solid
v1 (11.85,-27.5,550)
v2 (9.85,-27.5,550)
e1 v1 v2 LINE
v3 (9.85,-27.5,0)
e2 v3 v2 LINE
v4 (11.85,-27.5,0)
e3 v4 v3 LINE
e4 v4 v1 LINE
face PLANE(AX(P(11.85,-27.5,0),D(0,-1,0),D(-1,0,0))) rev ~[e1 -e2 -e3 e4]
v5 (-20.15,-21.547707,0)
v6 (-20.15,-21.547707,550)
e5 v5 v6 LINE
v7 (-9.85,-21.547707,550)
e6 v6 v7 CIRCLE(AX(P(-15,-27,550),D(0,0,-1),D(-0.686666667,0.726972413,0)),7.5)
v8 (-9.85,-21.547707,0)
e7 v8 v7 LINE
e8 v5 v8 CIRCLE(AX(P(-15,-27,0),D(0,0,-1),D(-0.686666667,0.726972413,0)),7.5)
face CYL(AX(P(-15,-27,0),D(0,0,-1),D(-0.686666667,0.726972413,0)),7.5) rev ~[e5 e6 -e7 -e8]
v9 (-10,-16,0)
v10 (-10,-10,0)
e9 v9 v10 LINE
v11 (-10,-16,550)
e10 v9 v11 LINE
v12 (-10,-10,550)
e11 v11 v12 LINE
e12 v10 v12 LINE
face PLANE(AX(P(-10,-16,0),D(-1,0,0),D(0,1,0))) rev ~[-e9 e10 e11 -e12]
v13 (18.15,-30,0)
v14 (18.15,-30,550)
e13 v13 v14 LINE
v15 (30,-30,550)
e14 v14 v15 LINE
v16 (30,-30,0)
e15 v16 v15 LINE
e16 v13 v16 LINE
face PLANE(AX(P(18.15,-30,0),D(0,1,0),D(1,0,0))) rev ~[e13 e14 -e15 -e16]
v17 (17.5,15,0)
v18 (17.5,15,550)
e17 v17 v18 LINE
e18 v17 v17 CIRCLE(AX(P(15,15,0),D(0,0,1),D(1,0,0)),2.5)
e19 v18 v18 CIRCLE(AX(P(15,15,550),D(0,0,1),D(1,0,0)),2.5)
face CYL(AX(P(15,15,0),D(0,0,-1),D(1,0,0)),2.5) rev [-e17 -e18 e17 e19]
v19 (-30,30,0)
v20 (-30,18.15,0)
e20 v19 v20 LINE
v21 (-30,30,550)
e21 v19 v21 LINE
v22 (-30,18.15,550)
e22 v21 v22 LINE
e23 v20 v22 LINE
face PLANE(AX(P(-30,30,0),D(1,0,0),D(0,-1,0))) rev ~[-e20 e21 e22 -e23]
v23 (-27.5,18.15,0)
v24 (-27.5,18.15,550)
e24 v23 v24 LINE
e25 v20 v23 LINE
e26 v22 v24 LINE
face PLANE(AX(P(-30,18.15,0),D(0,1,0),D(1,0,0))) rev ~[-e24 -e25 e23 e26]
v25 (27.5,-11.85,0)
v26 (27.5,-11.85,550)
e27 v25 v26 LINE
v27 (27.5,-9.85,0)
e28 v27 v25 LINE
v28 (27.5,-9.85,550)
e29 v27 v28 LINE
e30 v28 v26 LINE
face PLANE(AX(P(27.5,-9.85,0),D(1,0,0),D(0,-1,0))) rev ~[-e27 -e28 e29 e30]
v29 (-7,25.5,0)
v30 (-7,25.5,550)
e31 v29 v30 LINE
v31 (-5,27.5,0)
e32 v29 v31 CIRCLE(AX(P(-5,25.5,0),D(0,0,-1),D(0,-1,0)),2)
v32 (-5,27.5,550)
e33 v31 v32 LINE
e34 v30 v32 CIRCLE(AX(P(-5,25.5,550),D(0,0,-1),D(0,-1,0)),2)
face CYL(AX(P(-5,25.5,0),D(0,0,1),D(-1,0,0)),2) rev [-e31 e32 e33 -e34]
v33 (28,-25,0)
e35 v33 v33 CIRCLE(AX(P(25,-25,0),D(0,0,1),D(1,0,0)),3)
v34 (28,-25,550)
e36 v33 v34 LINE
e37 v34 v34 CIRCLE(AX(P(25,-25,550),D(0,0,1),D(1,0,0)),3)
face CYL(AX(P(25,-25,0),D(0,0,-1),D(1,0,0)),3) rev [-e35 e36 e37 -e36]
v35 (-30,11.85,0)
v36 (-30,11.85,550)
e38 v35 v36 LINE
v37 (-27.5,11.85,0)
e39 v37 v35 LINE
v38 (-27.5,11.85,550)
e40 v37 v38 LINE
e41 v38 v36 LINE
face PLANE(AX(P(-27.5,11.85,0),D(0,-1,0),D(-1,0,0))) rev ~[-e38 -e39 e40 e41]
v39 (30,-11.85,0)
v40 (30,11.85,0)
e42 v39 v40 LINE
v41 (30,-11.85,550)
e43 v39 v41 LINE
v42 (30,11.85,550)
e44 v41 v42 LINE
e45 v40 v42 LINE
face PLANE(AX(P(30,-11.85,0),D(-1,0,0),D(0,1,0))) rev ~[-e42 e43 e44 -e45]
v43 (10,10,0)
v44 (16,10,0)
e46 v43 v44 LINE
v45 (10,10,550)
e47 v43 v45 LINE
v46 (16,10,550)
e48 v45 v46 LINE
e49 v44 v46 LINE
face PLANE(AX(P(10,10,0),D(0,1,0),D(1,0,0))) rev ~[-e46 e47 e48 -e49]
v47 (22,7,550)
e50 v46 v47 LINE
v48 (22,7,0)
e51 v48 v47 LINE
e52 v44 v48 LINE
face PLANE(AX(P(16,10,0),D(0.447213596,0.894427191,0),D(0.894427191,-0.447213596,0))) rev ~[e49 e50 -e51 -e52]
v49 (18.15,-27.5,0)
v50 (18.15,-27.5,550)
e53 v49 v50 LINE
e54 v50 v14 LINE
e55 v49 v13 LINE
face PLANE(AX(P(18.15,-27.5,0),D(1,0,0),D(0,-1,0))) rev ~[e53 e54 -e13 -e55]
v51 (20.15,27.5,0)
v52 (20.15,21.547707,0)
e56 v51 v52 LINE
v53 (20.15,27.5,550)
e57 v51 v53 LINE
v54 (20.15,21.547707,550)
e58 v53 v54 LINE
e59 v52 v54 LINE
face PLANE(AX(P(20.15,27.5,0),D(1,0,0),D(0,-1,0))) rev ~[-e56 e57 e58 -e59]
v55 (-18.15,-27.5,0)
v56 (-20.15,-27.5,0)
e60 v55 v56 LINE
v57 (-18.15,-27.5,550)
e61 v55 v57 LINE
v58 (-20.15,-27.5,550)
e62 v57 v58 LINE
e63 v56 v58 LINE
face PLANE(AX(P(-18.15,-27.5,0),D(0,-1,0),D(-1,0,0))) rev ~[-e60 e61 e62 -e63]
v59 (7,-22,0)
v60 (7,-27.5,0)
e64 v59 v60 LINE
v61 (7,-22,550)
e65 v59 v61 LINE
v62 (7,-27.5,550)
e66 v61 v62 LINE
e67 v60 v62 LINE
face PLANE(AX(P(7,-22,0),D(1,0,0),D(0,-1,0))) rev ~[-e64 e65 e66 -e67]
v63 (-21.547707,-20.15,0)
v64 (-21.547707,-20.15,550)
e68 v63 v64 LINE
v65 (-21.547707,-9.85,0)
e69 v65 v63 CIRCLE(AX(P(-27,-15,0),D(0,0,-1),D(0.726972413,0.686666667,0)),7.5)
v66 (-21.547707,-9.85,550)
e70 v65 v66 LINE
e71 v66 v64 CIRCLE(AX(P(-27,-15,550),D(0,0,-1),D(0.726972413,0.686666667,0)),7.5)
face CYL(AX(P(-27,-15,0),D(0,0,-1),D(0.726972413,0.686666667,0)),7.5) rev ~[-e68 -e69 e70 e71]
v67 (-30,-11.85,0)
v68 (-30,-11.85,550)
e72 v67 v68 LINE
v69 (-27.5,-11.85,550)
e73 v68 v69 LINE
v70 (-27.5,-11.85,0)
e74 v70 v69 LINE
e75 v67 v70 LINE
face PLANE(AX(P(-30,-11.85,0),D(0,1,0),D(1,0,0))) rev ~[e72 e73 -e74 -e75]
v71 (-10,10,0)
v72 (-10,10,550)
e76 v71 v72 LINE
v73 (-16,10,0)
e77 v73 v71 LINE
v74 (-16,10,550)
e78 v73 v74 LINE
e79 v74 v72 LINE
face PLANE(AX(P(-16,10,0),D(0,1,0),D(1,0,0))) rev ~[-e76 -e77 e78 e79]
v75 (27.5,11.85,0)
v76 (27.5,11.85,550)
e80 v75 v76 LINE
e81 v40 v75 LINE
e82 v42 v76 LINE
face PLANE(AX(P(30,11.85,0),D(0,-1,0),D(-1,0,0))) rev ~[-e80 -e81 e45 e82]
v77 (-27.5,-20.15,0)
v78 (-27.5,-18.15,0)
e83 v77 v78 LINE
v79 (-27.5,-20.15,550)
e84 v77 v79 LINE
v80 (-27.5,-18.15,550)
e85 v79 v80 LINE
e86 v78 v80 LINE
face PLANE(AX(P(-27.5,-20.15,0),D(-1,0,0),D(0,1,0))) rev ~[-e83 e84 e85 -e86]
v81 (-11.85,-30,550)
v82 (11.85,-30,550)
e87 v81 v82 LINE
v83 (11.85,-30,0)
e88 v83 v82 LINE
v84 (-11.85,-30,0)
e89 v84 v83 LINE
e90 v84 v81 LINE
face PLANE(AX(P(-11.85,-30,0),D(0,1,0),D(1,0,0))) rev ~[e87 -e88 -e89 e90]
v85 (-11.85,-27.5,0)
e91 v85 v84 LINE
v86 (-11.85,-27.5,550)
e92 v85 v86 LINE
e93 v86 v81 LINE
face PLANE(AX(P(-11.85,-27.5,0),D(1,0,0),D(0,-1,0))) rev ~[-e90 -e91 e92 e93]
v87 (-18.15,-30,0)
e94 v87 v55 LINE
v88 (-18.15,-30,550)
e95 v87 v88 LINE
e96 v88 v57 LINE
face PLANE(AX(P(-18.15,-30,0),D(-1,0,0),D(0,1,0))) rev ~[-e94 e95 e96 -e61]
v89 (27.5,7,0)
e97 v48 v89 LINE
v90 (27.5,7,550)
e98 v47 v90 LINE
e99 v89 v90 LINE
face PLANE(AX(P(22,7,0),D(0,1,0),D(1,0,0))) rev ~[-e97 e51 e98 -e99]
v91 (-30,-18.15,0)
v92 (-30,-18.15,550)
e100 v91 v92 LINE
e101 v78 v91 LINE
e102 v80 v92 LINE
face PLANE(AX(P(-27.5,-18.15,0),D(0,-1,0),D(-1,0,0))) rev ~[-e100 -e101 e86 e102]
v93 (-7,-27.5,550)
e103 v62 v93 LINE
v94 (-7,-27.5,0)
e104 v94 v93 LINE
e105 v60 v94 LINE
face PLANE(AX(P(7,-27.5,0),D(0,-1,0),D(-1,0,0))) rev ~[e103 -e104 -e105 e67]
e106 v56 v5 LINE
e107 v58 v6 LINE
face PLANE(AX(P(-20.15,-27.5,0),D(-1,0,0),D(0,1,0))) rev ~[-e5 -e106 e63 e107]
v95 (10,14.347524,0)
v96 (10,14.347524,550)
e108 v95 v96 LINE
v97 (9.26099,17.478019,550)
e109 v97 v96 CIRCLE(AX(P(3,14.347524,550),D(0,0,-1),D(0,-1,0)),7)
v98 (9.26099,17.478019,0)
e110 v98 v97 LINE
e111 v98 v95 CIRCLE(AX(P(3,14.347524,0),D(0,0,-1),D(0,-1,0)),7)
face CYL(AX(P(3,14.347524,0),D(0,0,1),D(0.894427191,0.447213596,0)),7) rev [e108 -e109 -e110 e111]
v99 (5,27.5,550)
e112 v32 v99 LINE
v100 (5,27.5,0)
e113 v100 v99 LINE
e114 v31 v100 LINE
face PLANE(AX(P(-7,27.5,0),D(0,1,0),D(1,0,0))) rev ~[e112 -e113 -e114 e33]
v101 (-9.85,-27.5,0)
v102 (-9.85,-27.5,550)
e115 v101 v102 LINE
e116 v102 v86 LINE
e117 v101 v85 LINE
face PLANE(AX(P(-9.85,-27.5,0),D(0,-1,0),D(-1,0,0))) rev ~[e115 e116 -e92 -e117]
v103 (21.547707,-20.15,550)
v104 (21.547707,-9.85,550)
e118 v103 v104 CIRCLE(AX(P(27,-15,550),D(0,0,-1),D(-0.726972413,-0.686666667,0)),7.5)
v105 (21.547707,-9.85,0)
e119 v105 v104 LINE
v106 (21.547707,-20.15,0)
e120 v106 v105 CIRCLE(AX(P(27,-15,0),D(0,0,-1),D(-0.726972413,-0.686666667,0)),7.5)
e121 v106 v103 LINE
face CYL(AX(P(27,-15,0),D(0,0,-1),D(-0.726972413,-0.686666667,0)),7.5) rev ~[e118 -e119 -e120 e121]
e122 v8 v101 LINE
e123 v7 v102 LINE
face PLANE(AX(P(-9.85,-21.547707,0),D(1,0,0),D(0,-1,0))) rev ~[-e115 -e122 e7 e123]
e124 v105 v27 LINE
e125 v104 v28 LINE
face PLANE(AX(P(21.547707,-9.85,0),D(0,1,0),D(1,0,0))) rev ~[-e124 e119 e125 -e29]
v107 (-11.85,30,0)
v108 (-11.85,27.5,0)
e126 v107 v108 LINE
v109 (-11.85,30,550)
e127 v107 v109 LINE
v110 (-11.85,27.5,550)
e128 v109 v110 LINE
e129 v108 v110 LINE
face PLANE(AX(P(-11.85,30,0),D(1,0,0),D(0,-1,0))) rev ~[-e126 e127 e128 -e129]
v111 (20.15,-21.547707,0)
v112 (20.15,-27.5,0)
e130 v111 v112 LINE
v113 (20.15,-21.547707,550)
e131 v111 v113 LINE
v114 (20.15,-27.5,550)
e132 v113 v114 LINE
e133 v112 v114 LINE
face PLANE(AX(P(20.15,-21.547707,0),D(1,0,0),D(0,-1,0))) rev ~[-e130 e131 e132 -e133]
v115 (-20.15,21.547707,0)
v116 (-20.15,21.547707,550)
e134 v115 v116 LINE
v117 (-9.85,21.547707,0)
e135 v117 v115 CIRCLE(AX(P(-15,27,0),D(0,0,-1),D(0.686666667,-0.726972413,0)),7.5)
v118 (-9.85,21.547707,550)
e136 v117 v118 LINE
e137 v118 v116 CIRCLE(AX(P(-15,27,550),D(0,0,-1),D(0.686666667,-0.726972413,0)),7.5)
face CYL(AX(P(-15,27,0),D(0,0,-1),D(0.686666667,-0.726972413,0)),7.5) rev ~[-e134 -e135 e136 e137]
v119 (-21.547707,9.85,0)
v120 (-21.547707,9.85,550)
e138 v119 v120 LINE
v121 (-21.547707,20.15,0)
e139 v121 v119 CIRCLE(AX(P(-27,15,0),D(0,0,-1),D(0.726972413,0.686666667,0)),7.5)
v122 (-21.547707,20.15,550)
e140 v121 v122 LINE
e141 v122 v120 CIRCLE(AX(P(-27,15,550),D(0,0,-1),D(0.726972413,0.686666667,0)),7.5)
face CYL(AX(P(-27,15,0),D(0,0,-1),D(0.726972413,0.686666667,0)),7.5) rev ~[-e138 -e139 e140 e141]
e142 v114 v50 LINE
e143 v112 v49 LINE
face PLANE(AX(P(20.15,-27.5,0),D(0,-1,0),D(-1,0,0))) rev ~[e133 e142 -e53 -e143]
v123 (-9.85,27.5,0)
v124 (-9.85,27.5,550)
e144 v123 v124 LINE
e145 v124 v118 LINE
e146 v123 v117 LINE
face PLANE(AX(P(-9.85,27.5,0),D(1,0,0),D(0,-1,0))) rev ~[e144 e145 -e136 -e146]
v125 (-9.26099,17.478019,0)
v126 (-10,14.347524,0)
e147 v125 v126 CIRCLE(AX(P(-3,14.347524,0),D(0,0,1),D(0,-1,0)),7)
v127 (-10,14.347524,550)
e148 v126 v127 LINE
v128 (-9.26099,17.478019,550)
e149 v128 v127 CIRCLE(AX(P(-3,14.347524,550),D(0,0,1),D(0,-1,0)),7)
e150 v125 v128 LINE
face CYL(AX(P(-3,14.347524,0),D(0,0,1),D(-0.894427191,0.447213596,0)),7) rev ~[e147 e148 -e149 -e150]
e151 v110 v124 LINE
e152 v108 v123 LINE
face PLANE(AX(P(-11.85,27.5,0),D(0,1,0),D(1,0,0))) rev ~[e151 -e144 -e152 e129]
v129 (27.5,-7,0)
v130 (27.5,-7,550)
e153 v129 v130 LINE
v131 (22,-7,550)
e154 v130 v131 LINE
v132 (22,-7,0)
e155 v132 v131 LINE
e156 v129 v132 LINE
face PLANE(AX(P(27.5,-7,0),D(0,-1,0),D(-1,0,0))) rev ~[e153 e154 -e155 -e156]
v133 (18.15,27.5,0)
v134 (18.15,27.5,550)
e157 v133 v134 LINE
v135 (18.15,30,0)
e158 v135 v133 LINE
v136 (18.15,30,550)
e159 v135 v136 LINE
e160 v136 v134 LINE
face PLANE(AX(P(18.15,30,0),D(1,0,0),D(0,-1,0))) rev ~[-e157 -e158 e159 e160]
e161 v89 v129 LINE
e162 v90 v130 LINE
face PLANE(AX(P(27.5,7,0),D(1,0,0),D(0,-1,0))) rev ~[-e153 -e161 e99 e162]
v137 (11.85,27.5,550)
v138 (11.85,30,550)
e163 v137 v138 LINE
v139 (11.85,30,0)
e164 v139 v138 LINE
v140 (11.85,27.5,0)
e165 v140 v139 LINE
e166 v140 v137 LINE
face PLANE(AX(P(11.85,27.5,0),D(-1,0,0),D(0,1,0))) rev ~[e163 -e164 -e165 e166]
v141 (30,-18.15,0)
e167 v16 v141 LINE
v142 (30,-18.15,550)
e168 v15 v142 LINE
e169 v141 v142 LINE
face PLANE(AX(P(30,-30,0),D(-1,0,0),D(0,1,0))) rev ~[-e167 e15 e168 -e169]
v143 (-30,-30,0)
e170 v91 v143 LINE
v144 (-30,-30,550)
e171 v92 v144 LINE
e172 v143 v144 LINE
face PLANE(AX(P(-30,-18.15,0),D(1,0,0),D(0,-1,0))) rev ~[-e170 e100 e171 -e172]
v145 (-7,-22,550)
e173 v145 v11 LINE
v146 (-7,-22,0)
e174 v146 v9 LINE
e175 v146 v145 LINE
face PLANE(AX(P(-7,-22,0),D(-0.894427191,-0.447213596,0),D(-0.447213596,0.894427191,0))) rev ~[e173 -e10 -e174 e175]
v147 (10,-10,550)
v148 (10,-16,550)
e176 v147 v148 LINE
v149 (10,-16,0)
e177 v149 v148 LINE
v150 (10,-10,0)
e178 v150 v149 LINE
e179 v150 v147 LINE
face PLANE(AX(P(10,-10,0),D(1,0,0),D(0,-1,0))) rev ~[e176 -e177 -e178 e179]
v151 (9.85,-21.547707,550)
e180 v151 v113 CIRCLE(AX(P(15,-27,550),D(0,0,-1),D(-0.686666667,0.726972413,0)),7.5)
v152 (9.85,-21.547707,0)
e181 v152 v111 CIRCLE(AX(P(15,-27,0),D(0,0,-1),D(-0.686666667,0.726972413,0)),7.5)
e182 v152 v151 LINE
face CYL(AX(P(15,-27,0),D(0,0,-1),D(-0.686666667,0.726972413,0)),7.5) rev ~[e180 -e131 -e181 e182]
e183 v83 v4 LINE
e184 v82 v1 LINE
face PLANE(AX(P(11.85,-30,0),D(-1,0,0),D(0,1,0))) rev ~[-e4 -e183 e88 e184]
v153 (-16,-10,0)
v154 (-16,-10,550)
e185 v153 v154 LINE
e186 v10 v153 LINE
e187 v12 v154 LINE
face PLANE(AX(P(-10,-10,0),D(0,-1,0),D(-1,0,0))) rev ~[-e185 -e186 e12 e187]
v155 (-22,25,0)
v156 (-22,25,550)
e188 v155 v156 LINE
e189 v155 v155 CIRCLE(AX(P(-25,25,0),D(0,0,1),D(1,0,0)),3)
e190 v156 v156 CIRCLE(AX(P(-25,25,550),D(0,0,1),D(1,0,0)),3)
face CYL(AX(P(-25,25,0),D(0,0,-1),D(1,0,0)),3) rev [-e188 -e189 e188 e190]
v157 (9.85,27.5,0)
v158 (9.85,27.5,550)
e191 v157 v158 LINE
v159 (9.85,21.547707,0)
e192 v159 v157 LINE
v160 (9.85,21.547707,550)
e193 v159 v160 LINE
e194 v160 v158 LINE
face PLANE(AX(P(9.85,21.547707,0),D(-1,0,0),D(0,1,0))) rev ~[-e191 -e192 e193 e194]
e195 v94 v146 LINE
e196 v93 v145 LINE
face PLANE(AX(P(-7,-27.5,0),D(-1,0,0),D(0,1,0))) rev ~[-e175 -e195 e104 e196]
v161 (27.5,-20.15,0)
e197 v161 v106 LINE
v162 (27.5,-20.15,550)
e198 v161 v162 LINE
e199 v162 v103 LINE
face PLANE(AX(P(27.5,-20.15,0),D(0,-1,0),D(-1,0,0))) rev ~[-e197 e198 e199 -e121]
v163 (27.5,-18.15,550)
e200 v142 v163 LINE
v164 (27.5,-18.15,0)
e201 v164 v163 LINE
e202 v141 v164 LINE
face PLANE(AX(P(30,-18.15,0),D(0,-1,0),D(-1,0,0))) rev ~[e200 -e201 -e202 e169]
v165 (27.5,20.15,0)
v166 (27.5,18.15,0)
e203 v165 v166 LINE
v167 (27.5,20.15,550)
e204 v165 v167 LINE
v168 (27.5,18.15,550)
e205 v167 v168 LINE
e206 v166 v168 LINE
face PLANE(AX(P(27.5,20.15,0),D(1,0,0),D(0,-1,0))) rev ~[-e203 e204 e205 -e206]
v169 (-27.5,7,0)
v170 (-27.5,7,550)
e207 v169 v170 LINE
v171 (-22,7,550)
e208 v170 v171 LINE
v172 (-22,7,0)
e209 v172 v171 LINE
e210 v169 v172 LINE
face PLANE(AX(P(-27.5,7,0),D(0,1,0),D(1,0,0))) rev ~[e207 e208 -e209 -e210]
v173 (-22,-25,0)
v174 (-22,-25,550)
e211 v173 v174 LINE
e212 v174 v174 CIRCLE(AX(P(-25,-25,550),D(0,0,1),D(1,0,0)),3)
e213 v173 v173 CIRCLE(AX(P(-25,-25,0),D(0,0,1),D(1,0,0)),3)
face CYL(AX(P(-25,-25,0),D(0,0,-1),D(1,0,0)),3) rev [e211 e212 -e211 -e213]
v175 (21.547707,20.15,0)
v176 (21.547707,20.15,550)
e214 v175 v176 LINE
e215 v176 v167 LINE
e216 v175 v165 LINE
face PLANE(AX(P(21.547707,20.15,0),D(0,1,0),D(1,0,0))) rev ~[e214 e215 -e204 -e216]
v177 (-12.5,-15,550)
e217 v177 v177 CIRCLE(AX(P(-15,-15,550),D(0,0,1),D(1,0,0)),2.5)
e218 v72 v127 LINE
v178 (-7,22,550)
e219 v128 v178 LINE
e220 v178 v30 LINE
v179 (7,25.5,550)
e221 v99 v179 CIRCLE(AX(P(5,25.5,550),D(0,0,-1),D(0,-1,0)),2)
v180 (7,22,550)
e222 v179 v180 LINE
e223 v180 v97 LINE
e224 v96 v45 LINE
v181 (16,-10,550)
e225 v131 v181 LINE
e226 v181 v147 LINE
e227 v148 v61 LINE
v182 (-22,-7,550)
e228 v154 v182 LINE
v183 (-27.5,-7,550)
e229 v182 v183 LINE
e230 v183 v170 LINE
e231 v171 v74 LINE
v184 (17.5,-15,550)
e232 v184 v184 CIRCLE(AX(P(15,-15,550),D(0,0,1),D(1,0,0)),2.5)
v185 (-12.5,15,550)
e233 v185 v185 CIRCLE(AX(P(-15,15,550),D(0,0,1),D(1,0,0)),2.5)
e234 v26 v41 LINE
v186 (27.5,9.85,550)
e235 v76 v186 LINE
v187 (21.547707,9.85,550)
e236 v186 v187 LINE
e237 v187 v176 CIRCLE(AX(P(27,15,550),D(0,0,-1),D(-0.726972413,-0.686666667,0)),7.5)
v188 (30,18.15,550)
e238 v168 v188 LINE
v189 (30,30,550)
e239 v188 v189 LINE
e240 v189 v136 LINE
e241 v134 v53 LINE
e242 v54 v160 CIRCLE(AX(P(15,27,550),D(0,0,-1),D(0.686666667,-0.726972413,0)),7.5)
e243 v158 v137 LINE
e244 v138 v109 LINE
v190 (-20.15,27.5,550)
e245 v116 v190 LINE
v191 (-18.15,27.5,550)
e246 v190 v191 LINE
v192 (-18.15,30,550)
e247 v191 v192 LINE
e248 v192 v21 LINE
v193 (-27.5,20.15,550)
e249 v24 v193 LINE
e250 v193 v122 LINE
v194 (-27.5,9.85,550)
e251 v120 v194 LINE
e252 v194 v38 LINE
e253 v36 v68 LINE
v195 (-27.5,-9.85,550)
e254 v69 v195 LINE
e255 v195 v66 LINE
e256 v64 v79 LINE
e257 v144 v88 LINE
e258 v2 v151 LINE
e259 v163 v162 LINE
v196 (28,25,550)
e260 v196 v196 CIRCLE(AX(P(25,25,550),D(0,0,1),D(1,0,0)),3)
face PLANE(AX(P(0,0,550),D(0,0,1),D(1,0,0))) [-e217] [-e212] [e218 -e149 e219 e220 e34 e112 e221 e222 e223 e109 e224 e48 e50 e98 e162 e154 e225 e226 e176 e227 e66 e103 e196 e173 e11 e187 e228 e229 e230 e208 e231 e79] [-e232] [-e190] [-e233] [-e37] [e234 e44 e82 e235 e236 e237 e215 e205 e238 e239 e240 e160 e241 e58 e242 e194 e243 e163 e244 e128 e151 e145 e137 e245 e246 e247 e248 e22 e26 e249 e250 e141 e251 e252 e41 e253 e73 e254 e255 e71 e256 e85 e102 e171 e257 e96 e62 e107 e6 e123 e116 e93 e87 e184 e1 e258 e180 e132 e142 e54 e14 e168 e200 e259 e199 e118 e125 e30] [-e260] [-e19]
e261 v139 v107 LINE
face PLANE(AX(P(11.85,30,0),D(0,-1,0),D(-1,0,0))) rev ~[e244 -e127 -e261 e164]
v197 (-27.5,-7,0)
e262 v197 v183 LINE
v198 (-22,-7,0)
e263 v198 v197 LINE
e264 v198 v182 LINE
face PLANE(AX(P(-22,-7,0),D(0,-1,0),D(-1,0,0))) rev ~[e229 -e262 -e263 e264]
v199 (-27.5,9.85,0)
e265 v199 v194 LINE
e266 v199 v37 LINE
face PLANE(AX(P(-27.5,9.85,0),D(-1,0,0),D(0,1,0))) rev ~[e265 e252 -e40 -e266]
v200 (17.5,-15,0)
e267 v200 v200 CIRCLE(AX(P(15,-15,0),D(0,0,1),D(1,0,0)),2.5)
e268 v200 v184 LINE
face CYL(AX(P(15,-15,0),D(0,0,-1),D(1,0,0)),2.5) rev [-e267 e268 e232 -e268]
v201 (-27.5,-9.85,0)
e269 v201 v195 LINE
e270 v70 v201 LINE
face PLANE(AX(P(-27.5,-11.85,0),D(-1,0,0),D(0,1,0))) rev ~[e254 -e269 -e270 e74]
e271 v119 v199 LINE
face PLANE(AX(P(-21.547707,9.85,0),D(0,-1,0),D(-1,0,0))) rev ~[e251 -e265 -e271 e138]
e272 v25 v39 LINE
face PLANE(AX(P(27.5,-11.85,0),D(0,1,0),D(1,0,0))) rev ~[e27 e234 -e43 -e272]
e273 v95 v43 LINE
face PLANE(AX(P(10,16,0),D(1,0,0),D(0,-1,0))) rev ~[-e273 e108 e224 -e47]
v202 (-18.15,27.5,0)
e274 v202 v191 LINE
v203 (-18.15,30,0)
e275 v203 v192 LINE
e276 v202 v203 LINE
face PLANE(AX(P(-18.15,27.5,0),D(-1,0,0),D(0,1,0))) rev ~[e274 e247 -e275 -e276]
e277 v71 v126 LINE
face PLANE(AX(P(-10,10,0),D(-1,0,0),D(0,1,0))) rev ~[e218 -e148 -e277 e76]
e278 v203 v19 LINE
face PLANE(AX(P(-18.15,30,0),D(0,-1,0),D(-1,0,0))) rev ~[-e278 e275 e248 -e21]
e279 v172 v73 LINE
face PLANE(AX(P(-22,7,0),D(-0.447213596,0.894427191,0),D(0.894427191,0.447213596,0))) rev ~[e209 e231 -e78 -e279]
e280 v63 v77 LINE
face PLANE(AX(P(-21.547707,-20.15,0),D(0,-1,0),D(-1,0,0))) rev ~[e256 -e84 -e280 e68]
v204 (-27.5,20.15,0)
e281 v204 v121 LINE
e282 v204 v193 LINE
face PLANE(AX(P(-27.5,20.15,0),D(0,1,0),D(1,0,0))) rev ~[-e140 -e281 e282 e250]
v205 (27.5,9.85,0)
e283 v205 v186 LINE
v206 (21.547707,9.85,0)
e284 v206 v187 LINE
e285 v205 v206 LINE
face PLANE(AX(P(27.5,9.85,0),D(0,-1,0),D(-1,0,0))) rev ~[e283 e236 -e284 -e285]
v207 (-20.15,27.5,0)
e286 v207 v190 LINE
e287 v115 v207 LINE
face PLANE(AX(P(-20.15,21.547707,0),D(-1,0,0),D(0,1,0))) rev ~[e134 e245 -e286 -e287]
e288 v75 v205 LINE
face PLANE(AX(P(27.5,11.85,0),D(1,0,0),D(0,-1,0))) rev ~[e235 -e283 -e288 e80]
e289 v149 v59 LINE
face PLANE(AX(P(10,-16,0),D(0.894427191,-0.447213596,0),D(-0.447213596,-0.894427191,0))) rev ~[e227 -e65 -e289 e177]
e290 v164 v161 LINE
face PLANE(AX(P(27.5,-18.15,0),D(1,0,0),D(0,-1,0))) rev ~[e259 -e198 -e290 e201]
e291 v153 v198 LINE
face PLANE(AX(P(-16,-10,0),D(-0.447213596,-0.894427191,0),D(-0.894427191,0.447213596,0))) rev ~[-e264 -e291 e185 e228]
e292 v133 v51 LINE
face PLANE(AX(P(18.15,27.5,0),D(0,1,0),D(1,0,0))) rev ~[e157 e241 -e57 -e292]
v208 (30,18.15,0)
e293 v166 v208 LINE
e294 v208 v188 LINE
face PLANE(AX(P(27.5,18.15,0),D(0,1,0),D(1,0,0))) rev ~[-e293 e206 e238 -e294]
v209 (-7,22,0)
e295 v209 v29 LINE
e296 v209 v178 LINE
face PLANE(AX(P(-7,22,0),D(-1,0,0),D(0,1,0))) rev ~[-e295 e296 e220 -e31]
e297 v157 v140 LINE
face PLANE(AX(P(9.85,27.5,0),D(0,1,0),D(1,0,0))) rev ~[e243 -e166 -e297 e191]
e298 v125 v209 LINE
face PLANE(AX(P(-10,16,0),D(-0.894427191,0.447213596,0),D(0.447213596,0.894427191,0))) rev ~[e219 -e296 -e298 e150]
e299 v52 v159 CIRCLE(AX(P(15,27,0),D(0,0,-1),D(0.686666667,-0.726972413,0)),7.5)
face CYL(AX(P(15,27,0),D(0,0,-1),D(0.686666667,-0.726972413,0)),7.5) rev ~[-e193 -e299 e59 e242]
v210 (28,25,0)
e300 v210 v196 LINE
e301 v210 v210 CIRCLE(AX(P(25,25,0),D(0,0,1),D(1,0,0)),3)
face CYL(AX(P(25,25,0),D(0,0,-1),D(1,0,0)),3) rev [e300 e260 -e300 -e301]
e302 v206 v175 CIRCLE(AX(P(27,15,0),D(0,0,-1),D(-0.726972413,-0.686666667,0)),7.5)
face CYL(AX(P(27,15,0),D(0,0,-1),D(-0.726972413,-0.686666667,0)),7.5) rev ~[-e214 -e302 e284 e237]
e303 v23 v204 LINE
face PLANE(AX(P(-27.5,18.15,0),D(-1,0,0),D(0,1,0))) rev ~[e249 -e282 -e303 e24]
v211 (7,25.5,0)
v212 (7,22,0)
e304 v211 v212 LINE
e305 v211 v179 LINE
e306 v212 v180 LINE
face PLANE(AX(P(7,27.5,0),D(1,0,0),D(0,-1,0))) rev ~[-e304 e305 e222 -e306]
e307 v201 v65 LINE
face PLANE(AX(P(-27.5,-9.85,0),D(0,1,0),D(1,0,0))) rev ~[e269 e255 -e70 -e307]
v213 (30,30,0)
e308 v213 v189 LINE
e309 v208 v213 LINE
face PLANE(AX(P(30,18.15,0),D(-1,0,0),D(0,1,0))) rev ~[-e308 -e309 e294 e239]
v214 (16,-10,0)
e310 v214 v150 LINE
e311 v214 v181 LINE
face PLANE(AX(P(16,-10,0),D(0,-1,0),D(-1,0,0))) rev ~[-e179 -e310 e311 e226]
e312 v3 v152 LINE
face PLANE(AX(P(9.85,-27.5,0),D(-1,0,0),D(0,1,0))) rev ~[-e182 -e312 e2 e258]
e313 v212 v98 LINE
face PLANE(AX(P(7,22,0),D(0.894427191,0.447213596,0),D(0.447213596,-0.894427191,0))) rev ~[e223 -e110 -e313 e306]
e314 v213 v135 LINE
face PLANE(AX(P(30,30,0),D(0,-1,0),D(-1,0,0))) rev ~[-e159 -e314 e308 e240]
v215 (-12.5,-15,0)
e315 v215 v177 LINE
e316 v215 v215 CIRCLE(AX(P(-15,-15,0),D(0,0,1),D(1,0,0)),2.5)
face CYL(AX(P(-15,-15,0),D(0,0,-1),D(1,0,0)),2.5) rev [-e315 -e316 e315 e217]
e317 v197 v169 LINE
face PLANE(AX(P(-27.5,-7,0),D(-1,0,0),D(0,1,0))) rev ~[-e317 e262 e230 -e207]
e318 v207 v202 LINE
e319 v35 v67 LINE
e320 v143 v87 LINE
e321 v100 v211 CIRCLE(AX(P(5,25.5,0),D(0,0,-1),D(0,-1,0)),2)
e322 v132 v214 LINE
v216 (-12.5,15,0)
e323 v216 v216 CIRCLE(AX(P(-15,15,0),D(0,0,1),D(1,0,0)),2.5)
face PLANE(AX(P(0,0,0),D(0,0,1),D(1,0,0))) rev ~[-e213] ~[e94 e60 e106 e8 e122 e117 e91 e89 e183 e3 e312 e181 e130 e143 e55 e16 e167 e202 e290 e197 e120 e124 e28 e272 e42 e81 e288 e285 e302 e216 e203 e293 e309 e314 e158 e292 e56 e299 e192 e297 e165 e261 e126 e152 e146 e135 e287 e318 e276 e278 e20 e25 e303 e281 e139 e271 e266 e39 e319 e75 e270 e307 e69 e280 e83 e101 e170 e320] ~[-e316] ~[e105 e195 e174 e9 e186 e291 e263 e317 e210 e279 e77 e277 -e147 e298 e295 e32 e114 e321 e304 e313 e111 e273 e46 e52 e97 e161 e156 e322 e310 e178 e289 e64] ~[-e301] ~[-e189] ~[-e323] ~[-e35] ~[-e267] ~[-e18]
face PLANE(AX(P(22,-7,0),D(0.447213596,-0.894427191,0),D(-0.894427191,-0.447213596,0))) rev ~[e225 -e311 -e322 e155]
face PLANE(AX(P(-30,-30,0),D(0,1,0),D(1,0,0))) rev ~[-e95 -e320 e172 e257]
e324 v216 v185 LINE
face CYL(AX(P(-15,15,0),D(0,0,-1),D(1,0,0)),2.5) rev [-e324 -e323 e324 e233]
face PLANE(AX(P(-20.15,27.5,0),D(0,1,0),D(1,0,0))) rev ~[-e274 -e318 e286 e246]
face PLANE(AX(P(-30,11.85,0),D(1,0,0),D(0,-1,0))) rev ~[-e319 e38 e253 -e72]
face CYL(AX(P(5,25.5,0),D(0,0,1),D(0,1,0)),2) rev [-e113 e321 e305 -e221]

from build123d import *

# Parameters (mm, degrees)
F0_R     = 3
F0_R_2   = 2.5
F1_DEPTH = 550
F2_R     = 2
F3_R     = 7


# Not quite as in the source:
# - a feature names something its author has since deleted; it is built from what else it names


with BuildPart() as f1:
    # F0 (on Top) → F1 (new body)
    with BuildSketch(Plane.XY):
        with BuildLine():
            Line((18.15, -30), (30, -30))
            Line((30, -30), (30, -18.15))
            Line((30, -18.15), (27.5, -18.15))
            Line((27.5, -18.15), (27.5, -20.15))
            Line((27.5, -20.15), (21.5477069044, -20.15))
            ThreePointArc((21.5477069044, -20.15), (19.5, -15), (21.5477069044, -9.85))
            Line((21.5477069044, -9.85), (27.5, -9.85))
            Line((27.5, -9.85), (27.5, -11.85))
            Line((27.5, -11.85), (30, -11.85))
            Line((30, -11.85), (30, 11.85))
            Line((30, 11.85), (27.5, 11.85))
            Line((27.5, 11.85), (27.5, 9.85))
            Line((27.5, 9.85), (21.5477069044, 9.85))
            ThreePointArc((21.5477069044, 9.85), (19.5, 15), (21.5477069044, 20.15))
            Line((21.5477069044, 20.15), (27.5, 20.15))
            Line((27.5, 20.15), (27.5, 18.15))
            Line((27.5, 18.15), (30, 18.15))
            Line((30, 18.15), (30, 30))
            Line((30, 30), (18.15, 30))
            Line((18.15, 30), (18.15, 27.5))
            Line((18.15, 27.5), (20.15, 27.5))
            Line((20.15, 27.5), (20.15, 21.5477069044))
            ThreePointArc((20.15, 21.5477069044), (15, 19.5), (9.85, 21.5477069044))
            Line((9.85, 21.5477069044), (9.85, 27.5))
            Line((9.85, 27.5), (11.85, 27.5))
            Line((11.85, 27.5), (11.85, 30))
            Line((11.85, 30), (-11.85, 30))
            Line((-11.85, 30), (-11.85, 27.5))
            Line((-11.85, 27.5), (-9.85, 27.5))
            Line((-9.85, 27.5), (-9.85, 21.5477069044))
            ThreePointArc((-9.85, 21.5477069044), (-15, 19.5), (-20.15, 21.5477069044))
            Line((-20.15, 21.5477069044), (-20.15, 27.5))
            Line((-20.15, 27.5), (-18.15, 27.5))
            Line((-18.15, 27.5), (-18.15, 30))
            Line((-18.15, 30), (-30, 30))
            Line((-30, 30), (-30, 18.15))
            Line((-30, 18.15), (-27.5, 18.15))
            Line((-27.5, 18.15), (-27.5, 20.15))
            Line((-27.5, 20.15), (-21.5477069044, 20.15))
            ThreePointArc((-21.5477069044, 20.15), (-19.5, 15), (-21.5477069044, 9.85))
            Line((-21.5477069044, 9.85), (-27.5, 9.85))
            Line((-27.5, 9.85), (-27.5, 11.85))
            Line((-27.5, 11.85), (-30, 11.85))
            Line((-30, 11.85), (-30, -11.85))
            Line((-30, -11.85), (-27.5, -11.85))
            Line((-27.5, -11.85), (-27.5, -9.85))
            Line((-27.5, -9.85), (-21.5477069044, -9.85))
            ThreePointArc((-21.5477069044, -9.85), (-19.5, -15), (-21.5477069044, -20.15))
            Line((-21.5477069044, -20.15), (-27.5, -20.15))
            Line((-27.5, -20.15), (-27.5, -18.15))
            Line((-27.5, -18.15), (-30, -18.15))
            Line((-30, -18.15), (-30, -30))
            Line((-30, -30), (-18.15, -30))
            Line((-18.15, -30), (-18.15, -27.5))
            Line((-18.15, -27.5), (-20.15, -27.5))
            Line((-20.15, -27.5), (-20.15, -21.5477069044))
            ThreePointArc((-20.15, -21.5477069044), (-15, -19.5), (-9.85, -21.5477069044))
            Line((-9.85, -21.5477069044), (-9.85, -27.5))
            Line((-9.85, -27.5), (-11.85, -27.5))
            Line((-11.85, -27.5), (-11.85, -30))
            Line((-11.85, -30), (11.85, -30))
            Line((11.85, -30), (11.85, -27.5))
            Line((11.85, -27.5), (9.85, -27.5))
            Line((9.85, -27.5), (9.85, -21.5477069044))
            ThreePointArc((9.85, -21.5477069044), (15, -19.5), (20.15, -21.5477069044))
            Line((20.15, -21.5477069044), (20.15, -27.5))
            Line((20.15, -27.5), (18.15, -27.5))
            Line((18.15, -27.5), (18.15, -30))
        make_face()
        with Locations((-25, -25)):
            Circle(F0_R, mode=Mode.SUBTRACT)
        with Locations((-15, -15)):
            Circle(F0_R_2, mode=Mode.SUBTRACT)
        with Locations((25, -25)):
            Circle(F0_R, mode=Mode.SUBTRACT)
        with Locations((15, -15)):
            Circle(F0_R_2, mode=Mode.SUBTRACT)
        with Locations((-25, 25)):
            Circle(F0_R, mode=Mode.SUBTRACT)
        with Locations((-15, 15)):
            Circle(F0_R_2, mode=Mode.SUBTRACT)
        Polygon((-7, 22), (-7, 27.5), (0, 27.5), (7, 27.5), (7, 22), (10, 16), (10, 10), (16, 10), (22, 7), (27.5, 7), (27.5, 0), (27.5, -7), (22, -7), (16, -10), (10, -10), (10, -16), (7, -22), (7, -27.5), (0, -27.5), (-7, -27.5), (-7, -22), (-10, -16), (-10, -10), (-16, -10), (-22, -7), (-27.5, -7), (-27.5, 0), (-27.5, 7), (-22, 7), (-16, 10), (-10, 10), (-10, 16), align=None, mode=Mode.SUBTRACT)
        with Locations((15, 15)):
            Circle(F0_R_2, mode=Mode.SUBTRACT)
        with Locations((25, 25)):
            Circle(F0_R, mode=Mode.SUBTRACT)
    extrude(amount=F1_DEPTH)

    # F2
    f2_edges = [f1.edges().sort_by_distance(p)[0] for p in [
        (-7, 27.5, 275),
        (7, 27.5, 275),
    ]]
    fillet(f2_edges, radius=F2_R)

    # F3
    f3_edges = [f1.edges().sort_by_distance(p)[0] for p in [
        (-10, 16, 275),
        (10, 16, 275),
    ]]
    fillet(f3_edges, radius=F3_R)


solid = f1.part
